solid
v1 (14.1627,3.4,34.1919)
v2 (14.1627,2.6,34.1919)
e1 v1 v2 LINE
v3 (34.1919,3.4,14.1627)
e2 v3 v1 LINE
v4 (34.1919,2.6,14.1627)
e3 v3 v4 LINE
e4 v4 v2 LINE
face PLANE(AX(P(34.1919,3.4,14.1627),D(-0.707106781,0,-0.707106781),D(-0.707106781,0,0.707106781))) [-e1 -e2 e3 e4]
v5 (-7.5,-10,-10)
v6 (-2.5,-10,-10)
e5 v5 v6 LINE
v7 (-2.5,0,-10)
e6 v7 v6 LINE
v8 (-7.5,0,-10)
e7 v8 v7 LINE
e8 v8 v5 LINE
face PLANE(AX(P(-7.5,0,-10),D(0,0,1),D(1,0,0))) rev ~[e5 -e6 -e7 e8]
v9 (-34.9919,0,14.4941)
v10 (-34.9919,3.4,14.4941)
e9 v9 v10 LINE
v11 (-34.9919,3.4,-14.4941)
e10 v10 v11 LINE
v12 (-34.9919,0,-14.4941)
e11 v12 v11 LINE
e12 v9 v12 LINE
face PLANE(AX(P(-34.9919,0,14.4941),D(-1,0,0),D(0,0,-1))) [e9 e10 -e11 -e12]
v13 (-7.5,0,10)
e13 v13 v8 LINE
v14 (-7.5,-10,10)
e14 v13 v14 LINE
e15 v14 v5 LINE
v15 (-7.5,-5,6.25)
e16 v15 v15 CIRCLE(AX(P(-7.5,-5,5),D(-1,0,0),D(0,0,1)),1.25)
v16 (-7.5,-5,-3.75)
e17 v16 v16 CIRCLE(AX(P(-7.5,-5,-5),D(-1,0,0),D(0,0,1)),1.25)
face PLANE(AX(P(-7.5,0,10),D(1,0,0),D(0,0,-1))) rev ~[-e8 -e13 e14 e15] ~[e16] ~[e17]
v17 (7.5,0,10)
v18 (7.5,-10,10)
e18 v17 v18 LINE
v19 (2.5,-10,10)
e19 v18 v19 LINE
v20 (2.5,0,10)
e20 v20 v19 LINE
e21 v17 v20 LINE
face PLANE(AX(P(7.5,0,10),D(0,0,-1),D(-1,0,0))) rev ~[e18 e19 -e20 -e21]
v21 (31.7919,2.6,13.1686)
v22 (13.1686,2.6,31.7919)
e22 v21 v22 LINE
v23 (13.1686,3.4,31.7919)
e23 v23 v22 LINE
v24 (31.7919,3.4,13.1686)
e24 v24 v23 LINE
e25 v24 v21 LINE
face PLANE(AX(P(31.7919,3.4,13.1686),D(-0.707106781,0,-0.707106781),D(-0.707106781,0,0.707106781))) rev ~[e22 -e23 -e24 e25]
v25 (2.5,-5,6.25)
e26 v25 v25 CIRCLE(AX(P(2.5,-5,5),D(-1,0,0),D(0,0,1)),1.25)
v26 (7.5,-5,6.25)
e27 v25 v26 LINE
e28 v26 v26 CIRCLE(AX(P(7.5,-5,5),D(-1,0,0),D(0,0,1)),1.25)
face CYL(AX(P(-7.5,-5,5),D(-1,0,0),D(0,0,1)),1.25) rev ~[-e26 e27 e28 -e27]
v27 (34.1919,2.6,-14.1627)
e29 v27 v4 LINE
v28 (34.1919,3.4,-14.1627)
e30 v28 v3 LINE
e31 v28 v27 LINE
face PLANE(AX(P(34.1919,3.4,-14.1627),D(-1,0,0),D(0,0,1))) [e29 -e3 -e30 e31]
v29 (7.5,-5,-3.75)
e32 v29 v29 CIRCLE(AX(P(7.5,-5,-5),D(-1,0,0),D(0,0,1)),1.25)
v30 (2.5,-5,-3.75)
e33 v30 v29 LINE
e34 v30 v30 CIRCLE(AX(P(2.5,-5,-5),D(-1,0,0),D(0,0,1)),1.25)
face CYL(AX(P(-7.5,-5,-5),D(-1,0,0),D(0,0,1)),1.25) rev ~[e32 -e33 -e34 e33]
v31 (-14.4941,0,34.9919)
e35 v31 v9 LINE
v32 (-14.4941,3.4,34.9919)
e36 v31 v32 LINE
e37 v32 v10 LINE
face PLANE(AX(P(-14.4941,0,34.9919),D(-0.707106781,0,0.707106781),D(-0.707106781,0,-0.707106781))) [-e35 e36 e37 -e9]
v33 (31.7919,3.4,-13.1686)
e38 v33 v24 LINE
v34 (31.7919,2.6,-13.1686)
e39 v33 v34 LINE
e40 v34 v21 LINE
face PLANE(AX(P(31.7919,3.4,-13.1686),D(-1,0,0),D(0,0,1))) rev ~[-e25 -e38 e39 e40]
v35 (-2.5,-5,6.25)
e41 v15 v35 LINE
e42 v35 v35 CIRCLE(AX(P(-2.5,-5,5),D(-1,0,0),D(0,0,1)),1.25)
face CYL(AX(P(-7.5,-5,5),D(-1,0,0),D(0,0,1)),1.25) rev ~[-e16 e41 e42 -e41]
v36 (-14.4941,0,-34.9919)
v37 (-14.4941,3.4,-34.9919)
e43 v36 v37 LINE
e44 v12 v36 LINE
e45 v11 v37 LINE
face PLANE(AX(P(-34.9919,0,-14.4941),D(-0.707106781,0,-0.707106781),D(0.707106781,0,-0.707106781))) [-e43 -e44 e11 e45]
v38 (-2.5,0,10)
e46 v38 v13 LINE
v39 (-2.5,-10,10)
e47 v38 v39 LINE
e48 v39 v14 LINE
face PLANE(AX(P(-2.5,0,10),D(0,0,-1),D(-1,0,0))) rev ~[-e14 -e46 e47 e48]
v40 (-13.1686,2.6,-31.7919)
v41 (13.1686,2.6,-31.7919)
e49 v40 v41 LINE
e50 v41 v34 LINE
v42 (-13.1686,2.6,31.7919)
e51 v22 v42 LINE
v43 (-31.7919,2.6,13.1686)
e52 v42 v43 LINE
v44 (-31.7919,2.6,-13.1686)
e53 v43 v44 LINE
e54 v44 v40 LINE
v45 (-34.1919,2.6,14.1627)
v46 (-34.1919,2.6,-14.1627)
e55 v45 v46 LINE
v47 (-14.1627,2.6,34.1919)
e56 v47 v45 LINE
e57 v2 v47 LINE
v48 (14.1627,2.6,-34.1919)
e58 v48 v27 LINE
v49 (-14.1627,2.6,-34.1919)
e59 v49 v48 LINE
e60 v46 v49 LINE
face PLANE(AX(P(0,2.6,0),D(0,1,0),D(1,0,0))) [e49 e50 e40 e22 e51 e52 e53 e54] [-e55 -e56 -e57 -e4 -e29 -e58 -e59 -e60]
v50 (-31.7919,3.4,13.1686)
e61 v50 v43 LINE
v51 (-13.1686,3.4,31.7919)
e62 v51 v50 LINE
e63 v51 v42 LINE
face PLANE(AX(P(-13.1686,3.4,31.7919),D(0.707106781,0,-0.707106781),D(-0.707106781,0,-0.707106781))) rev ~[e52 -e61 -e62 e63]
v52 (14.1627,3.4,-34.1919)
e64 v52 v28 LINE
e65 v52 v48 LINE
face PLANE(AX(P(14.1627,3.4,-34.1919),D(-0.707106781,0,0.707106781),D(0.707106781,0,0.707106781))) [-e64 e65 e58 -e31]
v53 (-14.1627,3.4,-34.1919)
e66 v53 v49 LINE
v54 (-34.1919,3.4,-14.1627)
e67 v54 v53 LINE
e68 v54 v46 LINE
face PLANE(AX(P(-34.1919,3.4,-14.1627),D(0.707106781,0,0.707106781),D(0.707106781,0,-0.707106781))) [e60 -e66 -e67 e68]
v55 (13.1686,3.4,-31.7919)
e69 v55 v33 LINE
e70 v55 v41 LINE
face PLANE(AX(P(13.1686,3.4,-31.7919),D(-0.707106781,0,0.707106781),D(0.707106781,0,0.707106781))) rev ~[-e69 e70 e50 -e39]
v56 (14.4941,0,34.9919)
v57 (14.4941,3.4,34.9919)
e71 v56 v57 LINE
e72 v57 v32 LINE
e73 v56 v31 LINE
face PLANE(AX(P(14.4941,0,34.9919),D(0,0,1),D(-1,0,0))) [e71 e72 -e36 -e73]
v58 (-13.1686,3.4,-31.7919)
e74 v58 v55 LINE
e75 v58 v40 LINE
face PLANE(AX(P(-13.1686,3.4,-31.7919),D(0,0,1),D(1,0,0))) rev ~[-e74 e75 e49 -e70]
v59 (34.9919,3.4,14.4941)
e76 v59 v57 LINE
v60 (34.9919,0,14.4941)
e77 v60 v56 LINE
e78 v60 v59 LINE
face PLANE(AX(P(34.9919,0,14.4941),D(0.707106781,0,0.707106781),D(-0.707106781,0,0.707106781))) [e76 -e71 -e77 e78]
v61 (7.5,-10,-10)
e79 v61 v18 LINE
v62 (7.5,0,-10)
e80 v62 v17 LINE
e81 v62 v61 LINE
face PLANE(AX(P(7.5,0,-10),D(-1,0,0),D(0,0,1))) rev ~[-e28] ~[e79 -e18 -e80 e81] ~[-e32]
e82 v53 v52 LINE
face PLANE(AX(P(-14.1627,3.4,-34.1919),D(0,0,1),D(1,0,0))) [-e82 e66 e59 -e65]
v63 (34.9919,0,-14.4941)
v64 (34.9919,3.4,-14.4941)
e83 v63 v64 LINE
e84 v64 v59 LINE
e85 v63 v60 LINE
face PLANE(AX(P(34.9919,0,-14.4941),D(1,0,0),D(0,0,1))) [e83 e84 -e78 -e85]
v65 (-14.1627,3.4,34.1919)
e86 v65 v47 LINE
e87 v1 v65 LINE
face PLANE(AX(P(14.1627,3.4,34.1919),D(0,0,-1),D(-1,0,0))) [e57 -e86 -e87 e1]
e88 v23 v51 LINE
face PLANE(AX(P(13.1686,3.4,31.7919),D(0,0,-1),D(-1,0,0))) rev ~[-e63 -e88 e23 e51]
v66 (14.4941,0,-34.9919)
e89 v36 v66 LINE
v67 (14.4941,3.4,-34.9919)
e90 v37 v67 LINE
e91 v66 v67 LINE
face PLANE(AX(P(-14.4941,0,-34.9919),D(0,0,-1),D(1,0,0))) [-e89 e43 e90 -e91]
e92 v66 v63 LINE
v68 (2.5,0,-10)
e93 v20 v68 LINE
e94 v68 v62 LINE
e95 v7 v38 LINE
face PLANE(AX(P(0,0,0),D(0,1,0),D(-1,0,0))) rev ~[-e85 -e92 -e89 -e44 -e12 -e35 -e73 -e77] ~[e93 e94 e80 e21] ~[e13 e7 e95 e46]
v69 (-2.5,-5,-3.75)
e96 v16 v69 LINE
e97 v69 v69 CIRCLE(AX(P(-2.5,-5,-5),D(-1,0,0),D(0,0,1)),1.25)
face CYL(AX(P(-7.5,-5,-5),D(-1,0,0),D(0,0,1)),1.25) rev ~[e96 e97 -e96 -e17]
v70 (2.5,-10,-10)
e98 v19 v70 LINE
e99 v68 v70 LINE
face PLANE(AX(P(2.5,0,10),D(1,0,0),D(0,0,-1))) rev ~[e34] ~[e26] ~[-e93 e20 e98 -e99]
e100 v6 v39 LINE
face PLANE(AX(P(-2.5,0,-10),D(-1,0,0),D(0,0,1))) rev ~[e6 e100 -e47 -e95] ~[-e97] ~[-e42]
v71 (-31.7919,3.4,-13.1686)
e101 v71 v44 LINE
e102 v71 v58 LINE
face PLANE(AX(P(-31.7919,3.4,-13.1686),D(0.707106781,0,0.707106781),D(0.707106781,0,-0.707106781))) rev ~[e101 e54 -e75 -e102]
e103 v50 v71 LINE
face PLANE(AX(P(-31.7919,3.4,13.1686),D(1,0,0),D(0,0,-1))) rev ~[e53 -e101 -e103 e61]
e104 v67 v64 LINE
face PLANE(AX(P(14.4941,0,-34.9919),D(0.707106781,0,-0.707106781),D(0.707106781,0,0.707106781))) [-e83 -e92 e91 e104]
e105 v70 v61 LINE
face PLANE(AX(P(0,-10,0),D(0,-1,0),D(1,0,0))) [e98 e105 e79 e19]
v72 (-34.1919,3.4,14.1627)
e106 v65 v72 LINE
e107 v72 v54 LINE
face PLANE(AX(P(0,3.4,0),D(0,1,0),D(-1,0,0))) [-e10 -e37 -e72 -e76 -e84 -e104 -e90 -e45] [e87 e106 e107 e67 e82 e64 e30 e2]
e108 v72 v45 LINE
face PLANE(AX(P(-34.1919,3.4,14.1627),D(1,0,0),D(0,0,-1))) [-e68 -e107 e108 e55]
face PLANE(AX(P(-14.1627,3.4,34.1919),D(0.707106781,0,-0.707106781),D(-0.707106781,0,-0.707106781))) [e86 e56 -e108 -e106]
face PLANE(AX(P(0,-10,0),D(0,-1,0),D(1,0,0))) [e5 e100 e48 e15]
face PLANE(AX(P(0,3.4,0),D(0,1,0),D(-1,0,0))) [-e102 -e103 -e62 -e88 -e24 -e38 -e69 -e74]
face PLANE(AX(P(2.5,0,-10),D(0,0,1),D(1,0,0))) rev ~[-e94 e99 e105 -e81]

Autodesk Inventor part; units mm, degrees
ref_plane "YZ Plane" through (0, 0, 0) normal (1, 0, 0) x (0, 1, 0)
ref_plane "XZ Plane" through (0, 0, 0) normal (0, 1, 0) x (-1, 0, 0)
ref_plane "XY Plane" through (0, 0, 0) normal (0, 0, 1) x (1, 0, 0)
sketch "스케치3" plane through (0, 0, 0) normal (0, 1, 0) x (-1, 0, 0)
  line L0 (34.9919, -14.4941) -> (14.4941, -34.9919)
  line L1 (14.4941, -34.9919) -> (-14.4941, -34.9919)
  line L2 (-14.4941, -34.9919) -> (-34.9919, -14.4941)
  line L3 (-34.9919, -14.4941) -> (-34.9919, 14.4941)
  line L4 (-34.9919, 14.4941) -> (-14.4941, 34.9919)
  line L5 (-14.4941, 34.9919) -> (14.4941, 34.9919)
  line L6 (14.4941, 34.9919) -> (34.9919, 14.4941)
  line L7 (34.9919, 14.4941) -> (34.9919, -14.4941)
  line L8 (13.5, -32.5919) -> (-13.5, -32.5919)
  line L9 (-13.5, -32.5919) -> (-32.5919, -13.5)
  line L10 (-32.5919, -13.5) -> (-32.5919, 13.5)
  line L11 (-32.5919, 13.5) -> (-13.5, 32.5919)
  line L12 (-13.5, 32.5919) -> (13.5, 32.5919)
  line L13 (13.5, 32.5919) -> (32.5919, 13.5)
  line L14 (32.5919, 13.5) -> (32.5919, -13.5)
  line L15 (32.5919, -13.5) -> (13.5, -32.5919)
  point P0 (0, 0)
  point P1 (0, 0)
  point P2 (0, 0)
  point P3 (0, 0)
  dimension "d66" = 27
  dimension "d67" = 2.4
extrude "돌출2" add sketch "스케치3" along normal blind 3.4 contours L0 L1 L2 L3 L4 L5 L6 L7 | L8 L9 L10 L11 L12 L13 L14 L15
sketch "스케치4" plane through (0, 3.4, 0) normal (0, 1, 0) x (1, 0, 0)
  line L0 (13.5, -32.5919) -> (-13.5, -32.5919)
  line L1 (-13.5, -32.5919) -> (-32.5919, -13.5)
  line L2 (-32.5919, -13.5) -> (-32.5919, 13.5)
  line L3 (-32.5919, 13.5) -> (-13.5, 32.5919)
  line L4 (-13.5, 32.5919) -> (13.5, 32.5919)
  line L5 (13.5, 32.5919) -> (32.5919, 13.5)
  line L6 (32.5919, 13.5) -> (32.5919, -13.5)
  line L7 (32.5919, -13.5) -> (13.5, -32.5919)
  line L8 (-14.1627, 34.1919) -> (14.1627, 34.1919)
  line L9 (14.1627, 34.1919) -> (34.1919, 14.1627)
  line L10 (34.1919, 14.1627) -> (34.1919, -14.1627)
  line L11 (34.1919, -14.1627) -> (14.1627, -34.1919)
  line L12 (14.1627, -34.1919) -> (-14.1627, -34.1919)
  line L13 (-14.1627, -34.1919) -> (-34.1919, -14.1627)
  line L14 (-34.1919, -14.1627) -> (-34.1919, 14.1627)
  line L15 (-34.1919, 14.1627) -> (-14.1627, 34.1919)
  line L16 (-13.1686, 31.7919) -> (13.1686, 31.7919)
  line L17 (13.1686, 31.7919) -> (31.7919, 13.1686)
  line L18 (31.7919, 13.1686) -> (31.7919, -13.1686)
  line L19 (31.7919, -13.1686) -> (13.1686, -31.7919)
  line L20 (13.1686, -31.7919) -> (-13.1686, -31.7919)
  line L21 (-13.1686, -31.7919) -> (-31.7919, -13.1686)
  line L22 (-31.7919, -13.1686) -> (-31.7919, 13.1686)
  line L23 (-31.7919, 13.1686) -> (-13.1686, 31.7919)
  point P0 (0, 0)
  point P1 (0, 0)
  point P2 (0, 0)
  point P3 (0, 0)
  dimension "d7" = 27
  dimension "d68" = 1.6
  dimension "d69" = 0.8
extrude "돌출3" cut sketch "스케치4" against normal blind 0.8 contours L0 L1 L2 L3 L4 L5 L6 L7 | L8 L9 L10 L11 L12 L13 L14 L15
sketch "스케치9" plane through (0, 0, 0) normal (0, -1, 0) x (1, 0, 0)
  line L0 (7.5, 10) -> (2.5, 10)
  line L1 (2.5, 10) -> (2.5, -10)
  line L2 (2.5, -10) -> (7.5, -10)
  line L3 (7.5, -10) -> (7.5, 10)
  line L4 (7.5, 10) -> (2.5, -10) construction
  line L5 (2.5, 10) -> (7.5, -10) construction
  line L6 (-2.5, 10) -> (-7.5, 10)
  line L7 (-7.5, 10) -> (-7.5, -10)
  line L8 (-7.5, -10) -> (-2.5, -10)
  line L9 (-2.5, 10) -> (-7.5, -10) construction
  line L10 (-7.5, 10) -> (-2.5, -10) construction
  line L11 (-2.5, -10) -> (-2.5, 10)
  point P0 (0, 0)
  point P1 (5, 0)
  point P2 (-5, 0)
  dimension "d42" = 20
  dimension "d43" = 5
  dimension "d44" = 2.5
  dimension "d47" = 10
extrude "돌출8" add sketch "스케치9" along normal blind 10
sketch "스케치10" plane through (-7.5, 0, -10) normal (-1, 0, 0) x (0, 0, 1)
  circle A0 centre (15, -5) radius 1.25
  line L0 (19.9591, 0) -> (0.0886, 0)
  line L1 (24.4941, 0) -> (-4.4941, 0) projected
  circle A1 centre (5, -5) radius 1.25
  line L2 (20, 0) -> (20, -10) projected
  point P0 (10, 0)
  dimension "d54" = 2.5
  dimension "d57" = 10
  dimension "d62" = 5
  dimension "d63" = 5
extrude "돌출9" cut sketch "스케치10" against normal blind 20
properties part number "팔각형 OV-PAM 5패턴 하단 - 틈 너비 수정"
